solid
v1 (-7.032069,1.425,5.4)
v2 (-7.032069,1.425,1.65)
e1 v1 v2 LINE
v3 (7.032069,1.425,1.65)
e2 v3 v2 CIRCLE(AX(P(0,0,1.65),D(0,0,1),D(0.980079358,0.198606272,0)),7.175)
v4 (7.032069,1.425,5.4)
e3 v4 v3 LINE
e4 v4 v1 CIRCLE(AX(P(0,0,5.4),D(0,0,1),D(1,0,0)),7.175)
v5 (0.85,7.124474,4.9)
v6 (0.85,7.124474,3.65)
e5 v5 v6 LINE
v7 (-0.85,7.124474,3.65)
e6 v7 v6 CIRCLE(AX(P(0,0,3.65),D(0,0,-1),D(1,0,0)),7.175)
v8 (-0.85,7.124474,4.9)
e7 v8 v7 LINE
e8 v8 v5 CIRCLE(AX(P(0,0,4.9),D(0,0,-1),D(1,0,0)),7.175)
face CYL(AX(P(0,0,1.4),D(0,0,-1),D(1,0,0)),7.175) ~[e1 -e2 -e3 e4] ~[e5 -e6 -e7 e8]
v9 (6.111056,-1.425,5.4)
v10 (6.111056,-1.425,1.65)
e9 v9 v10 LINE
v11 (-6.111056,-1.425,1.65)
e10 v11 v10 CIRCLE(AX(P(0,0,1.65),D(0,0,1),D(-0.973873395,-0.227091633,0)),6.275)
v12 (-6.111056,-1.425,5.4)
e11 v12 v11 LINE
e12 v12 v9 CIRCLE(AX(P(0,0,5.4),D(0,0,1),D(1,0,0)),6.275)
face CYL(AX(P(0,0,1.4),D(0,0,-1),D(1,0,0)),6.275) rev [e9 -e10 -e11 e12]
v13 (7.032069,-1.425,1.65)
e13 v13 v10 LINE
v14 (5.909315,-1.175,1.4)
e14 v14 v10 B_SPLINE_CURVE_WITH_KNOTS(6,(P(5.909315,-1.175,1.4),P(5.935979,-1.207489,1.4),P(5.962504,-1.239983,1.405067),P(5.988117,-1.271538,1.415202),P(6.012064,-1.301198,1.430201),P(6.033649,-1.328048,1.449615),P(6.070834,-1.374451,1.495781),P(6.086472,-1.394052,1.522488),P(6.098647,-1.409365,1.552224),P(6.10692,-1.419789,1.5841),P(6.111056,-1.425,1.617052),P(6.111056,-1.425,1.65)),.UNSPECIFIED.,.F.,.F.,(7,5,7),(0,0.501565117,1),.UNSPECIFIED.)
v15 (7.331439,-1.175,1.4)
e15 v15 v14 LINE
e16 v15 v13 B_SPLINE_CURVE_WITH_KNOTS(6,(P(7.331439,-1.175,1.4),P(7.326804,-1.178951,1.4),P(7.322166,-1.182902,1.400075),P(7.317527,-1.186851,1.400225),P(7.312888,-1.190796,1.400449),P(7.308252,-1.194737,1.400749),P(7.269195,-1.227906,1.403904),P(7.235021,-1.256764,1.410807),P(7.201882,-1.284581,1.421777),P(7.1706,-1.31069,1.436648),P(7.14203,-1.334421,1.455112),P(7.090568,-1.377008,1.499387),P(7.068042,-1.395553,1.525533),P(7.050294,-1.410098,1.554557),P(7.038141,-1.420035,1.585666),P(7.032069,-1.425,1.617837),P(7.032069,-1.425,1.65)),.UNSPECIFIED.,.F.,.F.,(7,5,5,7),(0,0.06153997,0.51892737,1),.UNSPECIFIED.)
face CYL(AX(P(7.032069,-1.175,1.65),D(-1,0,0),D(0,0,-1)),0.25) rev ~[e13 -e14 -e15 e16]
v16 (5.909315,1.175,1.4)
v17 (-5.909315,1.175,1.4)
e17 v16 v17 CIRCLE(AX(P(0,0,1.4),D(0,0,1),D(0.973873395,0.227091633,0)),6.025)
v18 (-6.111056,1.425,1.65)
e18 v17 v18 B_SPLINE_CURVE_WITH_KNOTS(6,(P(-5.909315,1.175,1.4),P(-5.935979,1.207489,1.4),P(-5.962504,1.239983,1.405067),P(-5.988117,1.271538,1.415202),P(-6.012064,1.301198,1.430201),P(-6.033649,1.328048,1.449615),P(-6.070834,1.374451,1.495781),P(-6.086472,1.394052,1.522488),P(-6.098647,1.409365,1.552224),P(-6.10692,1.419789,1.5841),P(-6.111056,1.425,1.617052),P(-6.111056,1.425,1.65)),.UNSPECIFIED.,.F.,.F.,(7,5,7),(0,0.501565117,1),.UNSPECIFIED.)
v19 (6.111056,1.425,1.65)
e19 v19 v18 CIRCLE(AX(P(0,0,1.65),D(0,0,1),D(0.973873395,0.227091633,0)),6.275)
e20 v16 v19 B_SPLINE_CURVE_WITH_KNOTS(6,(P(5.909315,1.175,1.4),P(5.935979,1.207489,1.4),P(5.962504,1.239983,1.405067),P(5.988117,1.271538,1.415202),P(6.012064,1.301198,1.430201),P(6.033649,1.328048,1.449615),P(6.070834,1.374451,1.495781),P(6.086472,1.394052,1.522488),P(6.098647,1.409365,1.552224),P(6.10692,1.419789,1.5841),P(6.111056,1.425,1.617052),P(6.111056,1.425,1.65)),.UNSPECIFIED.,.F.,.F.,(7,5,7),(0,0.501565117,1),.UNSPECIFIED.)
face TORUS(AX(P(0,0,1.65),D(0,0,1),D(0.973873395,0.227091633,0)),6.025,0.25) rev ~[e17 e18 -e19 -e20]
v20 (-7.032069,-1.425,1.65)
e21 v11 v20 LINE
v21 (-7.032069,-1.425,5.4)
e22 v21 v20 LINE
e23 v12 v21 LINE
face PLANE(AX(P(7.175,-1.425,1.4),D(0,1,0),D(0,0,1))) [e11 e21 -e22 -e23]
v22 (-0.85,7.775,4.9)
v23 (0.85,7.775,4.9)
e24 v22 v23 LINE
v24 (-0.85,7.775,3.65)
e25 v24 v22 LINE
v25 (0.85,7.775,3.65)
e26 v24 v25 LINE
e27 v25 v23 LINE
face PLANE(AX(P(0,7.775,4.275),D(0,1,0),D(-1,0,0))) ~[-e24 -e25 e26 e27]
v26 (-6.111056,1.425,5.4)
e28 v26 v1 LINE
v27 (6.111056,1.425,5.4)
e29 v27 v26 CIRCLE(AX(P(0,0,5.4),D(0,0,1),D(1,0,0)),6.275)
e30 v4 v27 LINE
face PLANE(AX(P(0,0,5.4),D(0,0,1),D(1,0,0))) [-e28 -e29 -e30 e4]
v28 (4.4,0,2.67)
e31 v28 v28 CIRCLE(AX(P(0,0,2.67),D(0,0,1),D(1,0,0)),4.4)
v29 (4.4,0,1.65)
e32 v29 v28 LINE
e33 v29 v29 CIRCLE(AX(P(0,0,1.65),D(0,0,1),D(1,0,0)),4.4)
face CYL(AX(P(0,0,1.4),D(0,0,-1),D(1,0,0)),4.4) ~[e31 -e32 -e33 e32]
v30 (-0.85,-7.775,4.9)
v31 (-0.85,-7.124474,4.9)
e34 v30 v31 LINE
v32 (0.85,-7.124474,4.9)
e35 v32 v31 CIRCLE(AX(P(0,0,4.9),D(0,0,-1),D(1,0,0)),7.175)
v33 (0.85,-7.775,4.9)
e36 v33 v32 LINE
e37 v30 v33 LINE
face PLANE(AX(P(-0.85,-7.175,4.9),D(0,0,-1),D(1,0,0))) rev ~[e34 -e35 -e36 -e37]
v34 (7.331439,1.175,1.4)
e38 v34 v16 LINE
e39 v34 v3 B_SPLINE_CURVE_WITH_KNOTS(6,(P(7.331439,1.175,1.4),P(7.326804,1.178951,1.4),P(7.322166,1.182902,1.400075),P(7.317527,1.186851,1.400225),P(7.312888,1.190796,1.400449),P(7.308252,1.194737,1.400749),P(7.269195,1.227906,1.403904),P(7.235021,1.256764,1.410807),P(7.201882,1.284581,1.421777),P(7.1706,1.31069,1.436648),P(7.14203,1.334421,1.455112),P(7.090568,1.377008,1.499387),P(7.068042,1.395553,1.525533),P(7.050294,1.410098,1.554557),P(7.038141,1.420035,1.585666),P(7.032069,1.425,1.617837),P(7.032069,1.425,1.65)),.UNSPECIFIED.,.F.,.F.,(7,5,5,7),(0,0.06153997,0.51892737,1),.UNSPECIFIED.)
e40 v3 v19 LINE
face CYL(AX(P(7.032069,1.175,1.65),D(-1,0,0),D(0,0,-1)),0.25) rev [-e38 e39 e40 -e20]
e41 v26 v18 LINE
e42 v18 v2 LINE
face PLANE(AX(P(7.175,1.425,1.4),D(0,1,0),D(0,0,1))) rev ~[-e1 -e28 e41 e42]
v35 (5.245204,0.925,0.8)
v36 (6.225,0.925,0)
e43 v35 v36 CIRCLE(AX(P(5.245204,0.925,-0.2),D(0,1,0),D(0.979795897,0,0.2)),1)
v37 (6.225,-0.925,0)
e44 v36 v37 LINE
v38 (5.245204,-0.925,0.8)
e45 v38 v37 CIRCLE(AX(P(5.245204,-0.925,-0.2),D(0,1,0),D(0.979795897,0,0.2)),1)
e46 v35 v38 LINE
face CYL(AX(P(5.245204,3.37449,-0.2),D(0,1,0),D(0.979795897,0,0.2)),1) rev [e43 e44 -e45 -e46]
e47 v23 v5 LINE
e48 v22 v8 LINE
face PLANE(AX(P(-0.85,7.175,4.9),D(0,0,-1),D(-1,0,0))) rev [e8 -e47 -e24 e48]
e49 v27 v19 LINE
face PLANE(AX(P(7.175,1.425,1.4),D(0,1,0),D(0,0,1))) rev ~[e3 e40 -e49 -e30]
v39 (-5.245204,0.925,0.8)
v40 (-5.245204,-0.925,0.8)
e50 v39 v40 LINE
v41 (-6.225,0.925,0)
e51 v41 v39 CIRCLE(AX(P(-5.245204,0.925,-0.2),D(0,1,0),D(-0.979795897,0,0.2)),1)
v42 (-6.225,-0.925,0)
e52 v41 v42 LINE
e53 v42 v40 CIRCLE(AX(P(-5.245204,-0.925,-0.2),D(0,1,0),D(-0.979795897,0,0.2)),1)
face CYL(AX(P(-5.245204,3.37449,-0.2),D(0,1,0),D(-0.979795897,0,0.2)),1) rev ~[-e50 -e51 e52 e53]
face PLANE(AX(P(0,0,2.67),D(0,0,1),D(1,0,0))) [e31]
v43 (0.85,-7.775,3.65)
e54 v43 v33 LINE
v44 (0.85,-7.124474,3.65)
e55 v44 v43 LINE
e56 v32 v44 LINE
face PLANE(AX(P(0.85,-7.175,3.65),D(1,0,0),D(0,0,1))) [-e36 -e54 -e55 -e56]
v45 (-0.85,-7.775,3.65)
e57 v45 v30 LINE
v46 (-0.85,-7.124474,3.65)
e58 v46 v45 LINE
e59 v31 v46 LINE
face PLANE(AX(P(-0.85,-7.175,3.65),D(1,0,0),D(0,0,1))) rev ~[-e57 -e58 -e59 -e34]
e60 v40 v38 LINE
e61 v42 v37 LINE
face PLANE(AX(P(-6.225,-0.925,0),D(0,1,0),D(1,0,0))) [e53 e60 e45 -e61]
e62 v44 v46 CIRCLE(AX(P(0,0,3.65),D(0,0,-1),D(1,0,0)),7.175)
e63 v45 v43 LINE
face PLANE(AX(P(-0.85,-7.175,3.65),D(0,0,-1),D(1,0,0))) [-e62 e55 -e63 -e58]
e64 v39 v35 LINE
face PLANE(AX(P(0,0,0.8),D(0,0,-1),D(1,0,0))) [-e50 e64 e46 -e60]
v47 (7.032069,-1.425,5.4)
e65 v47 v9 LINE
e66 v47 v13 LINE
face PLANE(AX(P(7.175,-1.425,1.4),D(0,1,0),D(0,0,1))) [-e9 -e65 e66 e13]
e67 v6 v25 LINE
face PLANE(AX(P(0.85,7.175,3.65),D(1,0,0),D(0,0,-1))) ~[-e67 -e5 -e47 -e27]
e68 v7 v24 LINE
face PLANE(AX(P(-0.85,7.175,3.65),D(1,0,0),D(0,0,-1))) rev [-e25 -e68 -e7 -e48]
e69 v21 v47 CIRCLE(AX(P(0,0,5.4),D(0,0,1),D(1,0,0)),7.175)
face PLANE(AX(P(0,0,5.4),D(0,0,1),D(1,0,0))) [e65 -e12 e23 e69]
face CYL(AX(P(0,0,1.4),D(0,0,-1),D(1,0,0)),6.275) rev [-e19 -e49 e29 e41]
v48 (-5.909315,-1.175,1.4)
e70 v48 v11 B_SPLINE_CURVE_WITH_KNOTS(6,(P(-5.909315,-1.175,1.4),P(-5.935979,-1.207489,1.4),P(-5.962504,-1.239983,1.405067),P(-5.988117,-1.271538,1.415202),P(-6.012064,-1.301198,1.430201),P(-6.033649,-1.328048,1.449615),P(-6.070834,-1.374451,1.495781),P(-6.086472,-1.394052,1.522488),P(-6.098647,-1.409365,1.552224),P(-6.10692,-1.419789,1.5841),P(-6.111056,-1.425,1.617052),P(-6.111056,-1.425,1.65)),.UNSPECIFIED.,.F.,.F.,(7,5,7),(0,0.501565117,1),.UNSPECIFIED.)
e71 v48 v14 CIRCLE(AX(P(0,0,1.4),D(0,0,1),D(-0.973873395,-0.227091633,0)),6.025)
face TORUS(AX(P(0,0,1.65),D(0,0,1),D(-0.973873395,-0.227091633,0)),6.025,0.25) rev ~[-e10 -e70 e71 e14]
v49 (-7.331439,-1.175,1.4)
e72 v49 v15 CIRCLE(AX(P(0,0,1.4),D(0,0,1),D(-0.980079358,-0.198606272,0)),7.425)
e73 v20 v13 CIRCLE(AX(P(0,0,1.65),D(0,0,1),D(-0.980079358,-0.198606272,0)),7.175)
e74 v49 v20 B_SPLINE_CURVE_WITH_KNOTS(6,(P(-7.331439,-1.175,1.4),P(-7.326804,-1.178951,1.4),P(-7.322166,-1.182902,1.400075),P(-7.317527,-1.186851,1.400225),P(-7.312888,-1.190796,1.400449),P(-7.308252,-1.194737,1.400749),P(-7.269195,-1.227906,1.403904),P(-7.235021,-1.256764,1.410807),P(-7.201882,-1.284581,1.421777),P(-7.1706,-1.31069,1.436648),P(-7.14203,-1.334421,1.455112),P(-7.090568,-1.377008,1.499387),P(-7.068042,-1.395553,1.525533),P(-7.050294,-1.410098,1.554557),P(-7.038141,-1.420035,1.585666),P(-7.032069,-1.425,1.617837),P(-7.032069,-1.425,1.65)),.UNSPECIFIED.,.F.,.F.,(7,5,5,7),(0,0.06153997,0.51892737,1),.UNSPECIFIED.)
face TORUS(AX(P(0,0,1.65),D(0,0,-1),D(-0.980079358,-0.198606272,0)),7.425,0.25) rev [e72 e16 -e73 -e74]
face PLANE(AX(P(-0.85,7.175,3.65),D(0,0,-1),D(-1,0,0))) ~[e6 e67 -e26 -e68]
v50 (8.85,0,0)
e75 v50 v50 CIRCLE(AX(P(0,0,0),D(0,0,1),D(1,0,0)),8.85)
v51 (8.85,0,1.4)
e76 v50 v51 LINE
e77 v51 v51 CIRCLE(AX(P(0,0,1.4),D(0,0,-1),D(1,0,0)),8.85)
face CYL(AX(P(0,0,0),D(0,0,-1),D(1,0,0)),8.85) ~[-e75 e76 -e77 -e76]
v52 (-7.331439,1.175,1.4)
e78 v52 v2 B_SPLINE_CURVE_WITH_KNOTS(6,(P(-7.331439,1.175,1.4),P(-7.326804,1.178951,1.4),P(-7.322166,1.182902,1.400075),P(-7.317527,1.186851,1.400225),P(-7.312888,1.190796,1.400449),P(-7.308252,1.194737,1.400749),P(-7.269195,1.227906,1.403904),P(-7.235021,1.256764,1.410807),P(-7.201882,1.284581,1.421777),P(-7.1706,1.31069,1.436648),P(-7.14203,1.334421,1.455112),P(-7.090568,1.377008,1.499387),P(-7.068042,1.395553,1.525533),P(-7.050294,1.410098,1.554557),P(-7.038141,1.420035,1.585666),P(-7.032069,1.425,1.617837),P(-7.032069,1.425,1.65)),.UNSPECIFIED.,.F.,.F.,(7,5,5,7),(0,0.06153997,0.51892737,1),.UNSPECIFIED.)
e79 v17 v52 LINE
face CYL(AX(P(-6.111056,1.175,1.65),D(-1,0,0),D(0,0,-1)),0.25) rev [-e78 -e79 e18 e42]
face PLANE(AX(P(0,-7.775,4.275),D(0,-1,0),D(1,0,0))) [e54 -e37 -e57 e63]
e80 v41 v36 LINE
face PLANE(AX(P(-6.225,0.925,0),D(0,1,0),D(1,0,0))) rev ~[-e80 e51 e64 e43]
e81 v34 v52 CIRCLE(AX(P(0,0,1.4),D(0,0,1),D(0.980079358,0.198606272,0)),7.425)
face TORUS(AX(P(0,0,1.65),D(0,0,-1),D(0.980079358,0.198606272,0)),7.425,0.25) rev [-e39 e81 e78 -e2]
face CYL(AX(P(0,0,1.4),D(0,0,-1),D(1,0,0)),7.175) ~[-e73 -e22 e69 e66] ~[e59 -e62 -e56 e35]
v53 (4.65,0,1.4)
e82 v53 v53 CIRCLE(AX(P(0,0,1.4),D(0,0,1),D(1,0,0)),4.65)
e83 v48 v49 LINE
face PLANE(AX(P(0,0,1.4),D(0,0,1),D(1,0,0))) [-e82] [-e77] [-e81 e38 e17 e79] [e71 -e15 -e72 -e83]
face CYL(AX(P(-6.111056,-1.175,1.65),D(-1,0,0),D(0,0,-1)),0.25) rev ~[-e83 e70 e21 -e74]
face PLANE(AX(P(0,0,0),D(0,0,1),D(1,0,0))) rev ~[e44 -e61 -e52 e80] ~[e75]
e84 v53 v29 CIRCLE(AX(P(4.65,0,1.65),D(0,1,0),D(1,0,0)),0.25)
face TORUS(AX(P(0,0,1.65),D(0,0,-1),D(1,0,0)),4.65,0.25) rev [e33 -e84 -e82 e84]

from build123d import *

# Parameters (mm, degrees)
F0_R         = 8.85
F1_DEPTH     = 1.4
F2_R         = 7.175
F2_R_2       = 6.275
F3_DEPTH     = 4
F5_W         = 2.85
F5_H         = 4
F6_DEPTH     = 25
F7_R         = 4.4
F8_DEPTH     = 1.27
F10_W        = 1.7
F10_H        = 1.25
F11_DEPTH    = 0.6
F12_W        = 12.45
F12_H        = 1.85
F13_DEPTH    = 0.8
F14_T1_DEPTH = 6.7489794856
F15_R        = 0.25


# Not quite as in the source:
# - a fillet or chamfer that OpenCascade refuses, or shapes differently, is made with other operations: its cross-section is extruded or revolved along the edge and cut away or added
# - a pattern or mirror of a feature is missing from the dataset's text; its kind, count and spacing are read off the source's solid


with BuildPart() as f1:
    # F0 (on Top) → F1 (new body)
    with BuildSketch(Plane.XY):
        Circle(F0_R)
    extrude(amount=F1_DEPTH)

    # F2 (on face) → F3 (join)
    with BuildSketch(Plane.XY.offset(1.4)):
        Circle(F2_R)
        Circle(F2_R_2, mode=Mode.SUBTRACT)
    extrude(amount=F3_DEPTH)

    # F5 (on offset) → F6 (cut)
    with BuildSketch(Plane.YZ.offset(7.175)):
        with Locations((0, 3.4)):
            Rectangle(F5_W, F5_H)
    extrude(amount=-F6_DEPTH, mode=Mode.SUBTRACT)

    # F7 (on face) → F8 (join)
    with BuildSketch(Plane.XY.offset(1.4)):
        Circle(F7_R)
    extrude(amount=F8_DEPTH)

    # F10 (on offset) → F11 (join, symmetric)
    with BuildSketch(Plane.XZ.offset(7.175)):
        with Locations((0, 4.275)):
            Rectangle(F10_W, F10_H)
    f11 = extrude(amount=F11_DEPTH, both=True)

    # F11_copies: F11 across plane
    add(f11.mirror(Plane.ZX))

    # F12 (on face) → F13 (cut)
    with BuildSketch(Plane(origin=(0, 0, 0), x_dir=(1, 0, 0), z_dir=(0, 0, -1))):
        Rectangle(F12_W, F12_H)
    extrude(amount=-F13_DEPTH, mode=Mode.SUBTRACT)

    # F14: fillet of radius 1 on 2 edges, made by hand

    # F14_s2 → F14_t1 (join)
    with BuildSketch(Plane.XZ.offset(-3.3744897428)):
        with BuildLine():
            ThreePointArc((-6.225, 0), (-5.8776596349, 0.5745966692), (-5.2452041029, 0.8))
            Line((-5.2452041029, 0.8), (-6.225, 0.8))
            Line((-6.225, 0.8), (-6.225, 0))
        make_face()
        with BuildLine():
            ThreePointArc((6.225, 0), (5.8776596349, 0.5745966692), (5.2452041029, 0.8))
            Line((5.2452041029, 0.8), (6.225, 0.8))
            Line((6.225, 0.8), (6.225, 0))
        make_face()
    extrude(amount=F14_T1_DEPTH)

    # F15
    f15_edges = [f1.edges().sort_by_distance(p)[0] for p in [
        (0, 6.275, 1.4),
        (6.571562, 1.425, 1.4),
        (-6.571562, 1.425, 1.4),
        (0, 7.175, 1.4),
        (-4.4, 0, 1.4),
        (-6.571562, -1.425, 1.4),
        (6.571562, -1.425, 1.4),
        (0, -7.175, 1.4),
        (0, -6.275, 1.4),
    ]]
    fillet(f15_edges, radius=F15_R)


solid = f1.part
